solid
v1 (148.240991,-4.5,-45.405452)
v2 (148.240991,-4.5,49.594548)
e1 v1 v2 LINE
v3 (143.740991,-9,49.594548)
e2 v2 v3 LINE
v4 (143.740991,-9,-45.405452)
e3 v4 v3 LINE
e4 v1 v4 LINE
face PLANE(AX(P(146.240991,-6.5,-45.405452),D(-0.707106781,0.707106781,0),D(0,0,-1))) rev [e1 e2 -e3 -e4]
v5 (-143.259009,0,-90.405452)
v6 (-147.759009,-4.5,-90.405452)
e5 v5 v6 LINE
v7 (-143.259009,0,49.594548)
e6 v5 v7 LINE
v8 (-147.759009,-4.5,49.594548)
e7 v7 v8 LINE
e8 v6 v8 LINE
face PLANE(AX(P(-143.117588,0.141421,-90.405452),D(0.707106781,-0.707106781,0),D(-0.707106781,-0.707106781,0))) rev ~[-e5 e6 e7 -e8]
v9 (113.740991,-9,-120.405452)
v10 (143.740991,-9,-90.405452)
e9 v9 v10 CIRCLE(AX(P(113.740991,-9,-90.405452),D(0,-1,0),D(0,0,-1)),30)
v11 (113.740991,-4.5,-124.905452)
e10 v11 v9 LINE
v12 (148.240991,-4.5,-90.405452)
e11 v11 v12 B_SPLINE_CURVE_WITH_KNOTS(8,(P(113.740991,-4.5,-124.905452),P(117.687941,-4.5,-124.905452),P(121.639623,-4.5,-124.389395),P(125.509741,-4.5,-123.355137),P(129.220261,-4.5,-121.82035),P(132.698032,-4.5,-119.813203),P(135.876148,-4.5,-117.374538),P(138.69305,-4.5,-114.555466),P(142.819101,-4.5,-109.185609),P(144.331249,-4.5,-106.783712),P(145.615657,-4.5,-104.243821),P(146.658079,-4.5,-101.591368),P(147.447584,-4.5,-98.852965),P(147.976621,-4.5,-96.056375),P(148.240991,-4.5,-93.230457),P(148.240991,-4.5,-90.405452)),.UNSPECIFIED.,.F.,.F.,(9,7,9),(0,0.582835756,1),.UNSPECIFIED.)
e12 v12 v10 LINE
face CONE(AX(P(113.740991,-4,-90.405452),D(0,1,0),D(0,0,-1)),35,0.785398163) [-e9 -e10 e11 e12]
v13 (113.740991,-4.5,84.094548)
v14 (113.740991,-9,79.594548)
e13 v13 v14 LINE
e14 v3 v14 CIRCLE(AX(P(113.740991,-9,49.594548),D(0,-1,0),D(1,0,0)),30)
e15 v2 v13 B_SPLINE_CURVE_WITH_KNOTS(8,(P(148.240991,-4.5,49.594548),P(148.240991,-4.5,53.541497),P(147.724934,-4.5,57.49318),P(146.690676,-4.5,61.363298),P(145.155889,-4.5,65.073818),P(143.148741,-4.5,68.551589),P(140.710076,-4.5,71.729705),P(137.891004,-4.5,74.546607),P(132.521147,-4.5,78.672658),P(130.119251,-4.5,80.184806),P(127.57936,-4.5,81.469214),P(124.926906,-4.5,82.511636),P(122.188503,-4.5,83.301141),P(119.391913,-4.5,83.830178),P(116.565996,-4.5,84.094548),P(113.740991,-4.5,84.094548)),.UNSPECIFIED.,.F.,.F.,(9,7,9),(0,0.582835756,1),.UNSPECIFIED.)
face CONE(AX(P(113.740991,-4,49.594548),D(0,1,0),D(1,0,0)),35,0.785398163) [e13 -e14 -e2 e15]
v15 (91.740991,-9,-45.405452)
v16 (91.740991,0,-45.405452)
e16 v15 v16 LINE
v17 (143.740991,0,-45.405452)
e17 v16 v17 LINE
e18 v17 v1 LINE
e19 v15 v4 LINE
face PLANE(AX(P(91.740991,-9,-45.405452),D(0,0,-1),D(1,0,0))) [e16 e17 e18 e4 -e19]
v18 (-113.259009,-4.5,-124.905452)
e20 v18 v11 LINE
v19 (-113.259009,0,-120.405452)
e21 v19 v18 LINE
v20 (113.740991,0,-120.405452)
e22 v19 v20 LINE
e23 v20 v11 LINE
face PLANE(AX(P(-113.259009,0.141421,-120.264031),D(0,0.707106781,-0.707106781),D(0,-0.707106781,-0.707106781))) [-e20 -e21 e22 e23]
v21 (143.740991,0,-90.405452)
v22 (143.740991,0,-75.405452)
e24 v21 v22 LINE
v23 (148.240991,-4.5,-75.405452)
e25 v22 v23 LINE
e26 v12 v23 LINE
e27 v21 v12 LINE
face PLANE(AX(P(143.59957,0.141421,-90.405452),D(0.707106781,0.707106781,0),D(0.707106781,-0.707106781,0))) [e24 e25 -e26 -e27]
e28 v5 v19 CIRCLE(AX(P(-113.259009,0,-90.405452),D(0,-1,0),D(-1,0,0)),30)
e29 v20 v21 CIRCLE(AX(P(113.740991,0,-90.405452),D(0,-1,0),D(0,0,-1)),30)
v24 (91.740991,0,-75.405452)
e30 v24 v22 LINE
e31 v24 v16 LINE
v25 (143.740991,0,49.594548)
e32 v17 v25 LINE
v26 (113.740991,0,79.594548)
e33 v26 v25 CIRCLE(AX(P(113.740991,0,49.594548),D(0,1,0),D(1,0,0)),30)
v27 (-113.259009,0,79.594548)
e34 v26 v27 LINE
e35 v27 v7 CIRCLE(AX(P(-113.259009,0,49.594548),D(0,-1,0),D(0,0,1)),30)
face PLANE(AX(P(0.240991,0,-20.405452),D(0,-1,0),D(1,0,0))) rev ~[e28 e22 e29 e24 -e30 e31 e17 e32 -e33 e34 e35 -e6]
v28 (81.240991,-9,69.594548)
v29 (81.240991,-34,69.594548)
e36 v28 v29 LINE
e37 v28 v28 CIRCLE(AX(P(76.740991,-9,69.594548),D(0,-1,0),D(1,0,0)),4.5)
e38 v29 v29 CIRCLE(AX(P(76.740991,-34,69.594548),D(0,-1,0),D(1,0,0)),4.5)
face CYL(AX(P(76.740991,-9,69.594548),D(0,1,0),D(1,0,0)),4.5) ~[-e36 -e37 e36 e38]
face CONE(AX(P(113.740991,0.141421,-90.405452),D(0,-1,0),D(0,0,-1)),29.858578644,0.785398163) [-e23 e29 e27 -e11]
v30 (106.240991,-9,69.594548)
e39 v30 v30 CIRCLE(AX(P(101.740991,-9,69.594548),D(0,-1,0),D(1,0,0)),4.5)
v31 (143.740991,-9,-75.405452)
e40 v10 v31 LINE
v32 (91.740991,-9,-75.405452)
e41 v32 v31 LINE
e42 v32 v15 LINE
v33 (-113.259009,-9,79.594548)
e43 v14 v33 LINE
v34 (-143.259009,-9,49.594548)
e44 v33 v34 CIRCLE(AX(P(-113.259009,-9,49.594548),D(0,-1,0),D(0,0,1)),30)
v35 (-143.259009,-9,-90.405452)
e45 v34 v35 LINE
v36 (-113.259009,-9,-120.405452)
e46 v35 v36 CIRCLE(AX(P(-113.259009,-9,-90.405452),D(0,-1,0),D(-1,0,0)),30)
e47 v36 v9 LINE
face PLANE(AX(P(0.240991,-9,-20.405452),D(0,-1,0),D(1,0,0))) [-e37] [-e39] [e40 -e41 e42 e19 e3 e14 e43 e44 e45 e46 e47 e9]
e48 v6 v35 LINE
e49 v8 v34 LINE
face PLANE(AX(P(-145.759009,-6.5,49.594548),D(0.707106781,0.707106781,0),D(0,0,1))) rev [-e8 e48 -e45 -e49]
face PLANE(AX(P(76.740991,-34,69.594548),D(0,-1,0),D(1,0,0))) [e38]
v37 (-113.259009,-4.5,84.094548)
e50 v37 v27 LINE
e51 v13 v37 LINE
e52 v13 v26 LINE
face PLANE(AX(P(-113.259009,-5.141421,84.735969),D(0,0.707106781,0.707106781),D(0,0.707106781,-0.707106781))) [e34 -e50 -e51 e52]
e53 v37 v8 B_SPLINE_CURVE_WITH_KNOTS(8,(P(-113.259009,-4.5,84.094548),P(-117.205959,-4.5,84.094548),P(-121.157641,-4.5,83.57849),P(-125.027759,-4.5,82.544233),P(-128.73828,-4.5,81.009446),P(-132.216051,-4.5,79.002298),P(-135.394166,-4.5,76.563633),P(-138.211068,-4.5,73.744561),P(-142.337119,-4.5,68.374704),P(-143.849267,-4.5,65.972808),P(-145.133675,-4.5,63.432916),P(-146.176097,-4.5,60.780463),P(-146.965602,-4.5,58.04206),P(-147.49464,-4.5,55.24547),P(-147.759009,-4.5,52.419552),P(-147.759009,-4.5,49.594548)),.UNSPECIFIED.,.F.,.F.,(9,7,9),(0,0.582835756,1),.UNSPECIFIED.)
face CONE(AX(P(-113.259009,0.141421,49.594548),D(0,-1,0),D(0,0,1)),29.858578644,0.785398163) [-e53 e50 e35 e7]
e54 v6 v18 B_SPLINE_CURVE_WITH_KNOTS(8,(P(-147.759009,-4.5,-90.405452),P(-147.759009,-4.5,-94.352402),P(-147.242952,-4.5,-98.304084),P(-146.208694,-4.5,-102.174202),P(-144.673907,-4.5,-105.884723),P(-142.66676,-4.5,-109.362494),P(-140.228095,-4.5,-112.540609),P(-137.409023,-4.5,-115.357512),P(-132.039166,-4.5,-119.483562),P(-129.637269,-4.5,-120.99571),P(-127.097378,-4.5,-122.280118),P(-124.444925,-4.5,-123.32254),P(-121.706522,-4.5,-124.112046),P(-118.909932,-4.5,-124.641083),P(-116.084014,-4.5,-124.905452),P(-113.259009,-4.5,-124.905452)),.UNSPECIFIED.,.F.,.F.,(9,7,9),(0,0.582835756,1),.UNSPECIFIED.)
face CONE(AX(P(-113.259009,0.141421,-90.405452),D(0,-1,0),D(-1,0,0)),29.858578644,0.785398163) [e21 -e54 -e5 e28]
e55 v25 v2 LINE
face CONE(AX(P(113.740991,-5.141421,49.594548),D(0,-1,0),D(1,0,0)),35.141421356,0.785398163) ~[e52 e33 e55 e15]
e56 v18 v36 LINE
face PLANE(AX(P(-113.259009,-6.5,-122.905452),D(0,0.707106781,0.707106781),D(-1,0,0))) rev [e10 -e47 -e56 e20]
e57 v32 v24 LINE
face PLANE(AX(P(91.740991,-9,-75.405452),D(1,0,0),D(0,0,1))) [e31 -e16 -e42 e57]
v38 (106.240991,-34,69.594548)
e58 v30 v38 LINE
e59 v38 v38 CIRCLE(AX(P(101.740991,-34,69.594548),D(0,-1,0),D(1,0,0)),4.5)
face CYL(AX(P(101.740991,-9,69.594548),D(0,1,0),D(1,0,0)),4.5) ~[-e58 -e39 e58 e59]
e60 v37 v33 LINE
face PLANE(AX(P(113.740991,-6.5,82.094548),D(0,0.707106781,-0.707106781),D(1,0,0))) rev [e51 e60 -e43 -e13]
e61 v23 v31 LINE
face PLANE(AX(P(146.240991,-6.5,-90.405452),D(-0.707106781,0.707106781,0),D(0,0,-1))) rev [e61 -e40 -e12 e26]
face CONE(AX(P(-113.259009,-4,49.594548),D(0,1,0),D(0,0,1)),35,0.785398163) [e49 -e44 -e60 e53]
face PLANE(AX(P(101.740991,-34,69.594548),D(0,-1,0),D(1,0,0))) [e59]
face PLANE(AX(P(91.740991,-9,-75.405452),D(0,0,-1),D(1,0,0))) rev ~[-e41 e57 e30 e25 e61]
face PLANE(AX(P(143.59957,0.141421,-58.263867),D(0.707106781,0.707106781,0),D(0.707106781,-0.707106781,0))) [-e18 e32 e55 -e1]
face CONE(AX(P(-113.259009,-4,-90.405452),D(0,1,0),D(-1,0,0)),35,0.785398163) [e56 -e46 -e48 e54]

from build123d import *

# Parameters (mm, degrees)
F1_DEPTH     = 9
F2_R         = 4.5
F3_DEPTH     = 25
F4_W         = 57
F4_H         = 30
F5_DEPTH     = 25
F6_SIZE      = 5
F7_T1_DEPTH  = 227
F7_T3_DEPTH  = 107.8584149398
F7_T5_DEPTH  = 27.8584149398
F7_T7_DEPTH  = 140
F7_T10_ANGLE = 90
F7_T12_ANGLE = 90
F7_T14_ANGLE = 90
F7_T16_ANGLE = 90


# Not quite as in the source:
# - a fillet or chamfer that OpenCascade refuses, or shapes differently, is made with other operations: its cross-section is extruded or revolved along the edge and cut away or added


with BuildPart() as f1:
    # F0 (on Front) → F1 (new body)
    with BuildSketch(Plane.XZ):
        with BuildLine():
            Line((113.7409908921, 84.5945477496), (-113.2590091079, 84.5945477496))
            ThreePointArc((-113.2590091079, 84.5945477496), (-138.0077464495, 74.3432850912), (-148.2590091079, 49.5945477496))
            Line((-148.2590091079, 49.5945477496), (-148.2590091079, -90.4054522504))
            ThreePointArc((-148.2590091079, -90.4054522504), (-138.0077464495, -115.1541895919), (-113.2590091079, -125.4054522504))
            Line((-113.2590091079, -125.4054522504), (113.7409908921, -125.4054522504))
            ThreePointArc((113.7409908921, -125.4054522504), (138.4897282336, -115.1541895919), (148.7409908921, -90.4054522504))
            Line((148.7409908921, -90.4054522504), (148.7409908921, 49.5945477496))
            ThreePointArc((148.7409908921, 49.5945477496), (138.4897282336, 74.3432850912), (113.7409908921, 84.5945477496))
        make_face()
    extrude(amount=F1_DEPTH)

    # F2 (on face) → F3 (join)
    with BuildSketch(Plane.XZ.offset(9)):
        with Locations((101.7409908921, 69.5945477496)):
            Circle(F2_R)
        with Locations((76.7409908921, 69.5945477496)):
            Circle(F2_R)
    extrude(amount=F3_DEPTH)

    # F4 (on face) → F5 (cut)
    with BuildSketch(Plane.XZ.offset(9)):
        with Locations((120.2409908921, -60.4054522504)):
            Rectangle(F4_W, F4_H)
    extrude(amount=-F5_DEPTH, mode=Mode.SUBTRACT)

    # F6
    f6_edges = [f1.edges().sort_by_distance(p)[0] for p in [
        (0.240991, -9, 84.594548),
    ]]
    chamfer(f6_edges, length=F6_SIZE)

    # F7: chamfer of 5 on 9 edges, made by hand

    # F7_s2 → F7_t1 (cut)
    with BuildSketch(Plane.YZ.offset(-113.2590091079)):
        with BuildLine():
            Line((-5.1414213562, 84.7359691059), (0.1414213562, 79.4531263934))
            Line((0.1414213562, 79.4531263934), (0.2414213562, 79.4531263934))
            ThreePointArc((0.2414213562, 79.4531263934), (0.1, 82.0238370715), (0.1, 84.5945477496))
            Line((0.1, 84.5945477496), (0, 84.6945477496))
            ThreePointArc((0, 84.6945477496), (-2.5707106781, 84.6945477496), (-5.1414213562, 84.8359691059))
            Line((-5.1414213562, 84.8359691059), (-5.1414213562, 84.7359691059))
        make_face()
        with BuildLine():
            Line((0.1414213562, -120.2640308941), (-5.1414213562, -125.5468736066))
            Line((-5.1414213562, -125.5468736066), (-5.1414213562, -125.6468736066))
            ThreePointArc((-5.1414213562, -125.6468736066), (-2.5707106781, -125.5054522504), (0, -125.5054522504))
            Line((0, -125.5054522504), (0.1, -125.4054522504))
            ThreePointArc((0.1, -125.4054522504), (0.1, -122.8347415723), (0.2414213562, -120.2640308941))
            Line((0.2414213562, -120.2640308941), (0.1414213562, -120.2640308941))
        make_face()
    extrude(amount=F7_T1_DEPTH, mode=Mode.SUBTRACT)

    # F7_s4 → F7_t3 (cut)
    with BuildSketch(Plane.XY.offset(-58.2638671902)):
        with BuildLine():
            Line((143.5995695358, 0.1414213562), (148.8824122483, -5.1414213562))
            Line((148.8824122483, -5.1414213562), (148.9824122483, -5.1414213562))
            ThreePointArc((148.9824122483, -5.1414213562), (148.8409908921, -2.5707106781), (148.8409908921, 0))
            Line((148.8409908921, 0), (148.7409908921, 0.1))
            ThreePointArc((148.7409908921, 0.1), (146.1702802139, 0.1), (143.5995695358, 0.2414213562))
            Line((143.5995695358, 0.2414213562), (143.5995695358, 0.1414213562))
        make_face()
    extrude(amount=F7_T3_DEPTH, mode=Mode.SUBTRACT)

    # F7_s6 → F7_t5 (cut)
    with BuildSketch(Plane.XY.offset(-90.4054522504)):
        with BuildLine():
            Line((143.5995695358, 0.1414213562), (148.8824122483, -5.1414213562))
            Line((148.8824122483, -5.1414213562), (148.9824122483, -5.1414213562))
            ThreePointArc((148.9824122483, -5.1414213562), (148.8409908921, -2.5707106781), (148.8409908921, 0))
            Line((148.8409908921, 0), (148.7409908921, 0.1))
            ThreePointArc((148.7409908921, 0.1), (146.1702802139, 0.1), (143.5995695358, 0.2414213562))
            Line((143.5995695358, 0.2414213562), (143.5995695358, 0.1414213562))
        make_face()
    extrude(amount=F7_T5_DEPTH, mode=Mode.SUBTRACT)

    # F7_s8 → F7_t7 (cut)
    with BuildSketch(Plane.XY.offset(-90.4054522504)):
        with BuildLine():
            Line((-143.1175877517, 0.1414213562), (-148.4004304642, -5.1414213562))
            Line((-148.4004304642, -5.1414213562), (-148.5004304642, -5.1414213562))
            ThreePointArc((-148.5004304642, -5.1414213562), (-148.3590091079, -2.5707106781), (-148.3590091079, 0))
            Line((-148.3590091079, 0), (-148.2590091079, 0.1))
            ThreePointArc((-148.2590091079, 0.1), (-145.6882984298, 0.1), (-143.1175877517, 0.2414213562))
            Line((-143.1175877517, 0.2414213562), (-143.1175877517, 0.1414213562))
        make_face()
    extrude(amount=F7_T7_DEPTH, mode=Mode.SUBTRACT)

    # F7_s9 → F7_t10 (revolve, cut)
    with BuildSketch(Plane.XY.offset(49.5945477496)):
        with BuildLine():
            Line((148.8824122483, -5.1414213562), (143.5995695358, 0.1414213562))
            Line((143.5995695358, 0.1414213562), (143.5995695358, 0.2414213562))
            ThreePointArc((143.5995695358, 0.2414213562), (146.1702802139, 0.1), (148.7409908921, 0.1))
            Line((148.7409908921, 0.1), (148.8409908921, 0))
            ThreePointArc((148.8409908921, 0), (148.8409908921, -2.5707106781), (148.9824122483, -5.1414213562))
            Line((148.9824122483, -5.1414213562), (148.8824122483, -5.1414213562))
        make_face()
    revolve(axis=Axis((113.7409908921, 0, 49.5945477496), (0, -1, 0)), revolution_arc=F7_T10_ANGLE, mode=Mode.SUBTRACT)

    # F7_s11 → F7_t12 (revolve, cut)
    with BuildSketch(Plane.YZ.offset(113.7409908921)):
        with BuildLine():
            Line((0.1414213562, -120.2640308941), (-5.1414213562, -125.5468736066))
            Line((-5.1414213562, -125.5468736066), (-5.1414213562, -125.6468736066))
            ThreePointArc((-5.1414213562, -125.6468736066), (-2.5707106781, -125.5054522504), (0, -125.5054522504))
            Line((0, -125.5054522504), (0.1, -125.4054522504))
            ThreePointArc((0.1, -125.4054522504), (0.1, -122.8347415723), (0.2414213562, -120.2640308941))
            Line((0.2414213562, -120.2640308941), (0.1414213562, -120.2640308941))
        make_face()
    revolve(axis=Axis((113.7409908921, 0, -90.4054522504), (0, -1, 0)), revolution_arc=F7_T12_ANGLE, mode=Mode.SUBTRACT)

    # F7_s13 → F7_t14 (revolve, cut)
    with BuildSketch(Plane.XY.offset(-90.4054522504)):
        with BuildLine():
            Line((-143.1175877517, 0.1414213562), (-148.4004304642, -5.1414213562))
            Line((-148.4004304642, -5.1414213562), (-148.5004304642, -5.1414213562))
            ThreePointArc((-148.5004304642, -5.1414213562), (-148.3590091079, -2.5707106781), (-148.3590091079, 0))
            Line((-148.3590091079, 0), (-148.2590091079, 0.1))
            ThreePointArc((-148.2590091079, 0.1), (-145.6882984298, 0.1), (-143.1175877517, 0.2414213562))
            Line((-143.1175877517, 0.2414213562), (-143.1175877517, 0.1414213562))
        make_face()
    revolve(axis=Axis((-113.2590091079, 0, -90.4054522504), (0, -1, 0)), revolution_arc=F7_T14_ANGLE, mode=Mode.SUBTRACT)

    # F7_s15 → F7_t16 (revolve, cut)
    with BuildSketch(Plane.YZ.offset(-113.2590091079)):
        with BuildLine():
            Line((0.1414213562, 79.4531263934), (-5.1414213562, 84.7359691059))
            Line((-5.1414213562, 84.7359691059), (-5.1414213562, 84.8359691059))
            ThreePointArc((-5.1414213562, 84.8359691059), (-2.5707106781, 84.6945477496), (0, 84.6945477496))
            Line((0, 84.6945477496), (0.1, 84.5945477496))
            ThreePointArc((0.1, 84.5945477496), (0.1, 82.0238370715), (0.2414213562, 79.4531263934))
            Line((0.2414213562, 79.4531263934), (0.1414213562, 79.4531263934))
        make_face()
    revolve(axis=Axis((-113.2590091079, 0, 49.5945477496), (0, -1, 0)), revolution_arc=F7_T16_ANGLE, mode=Mode.SUBTRACT)


solid = f1.part
